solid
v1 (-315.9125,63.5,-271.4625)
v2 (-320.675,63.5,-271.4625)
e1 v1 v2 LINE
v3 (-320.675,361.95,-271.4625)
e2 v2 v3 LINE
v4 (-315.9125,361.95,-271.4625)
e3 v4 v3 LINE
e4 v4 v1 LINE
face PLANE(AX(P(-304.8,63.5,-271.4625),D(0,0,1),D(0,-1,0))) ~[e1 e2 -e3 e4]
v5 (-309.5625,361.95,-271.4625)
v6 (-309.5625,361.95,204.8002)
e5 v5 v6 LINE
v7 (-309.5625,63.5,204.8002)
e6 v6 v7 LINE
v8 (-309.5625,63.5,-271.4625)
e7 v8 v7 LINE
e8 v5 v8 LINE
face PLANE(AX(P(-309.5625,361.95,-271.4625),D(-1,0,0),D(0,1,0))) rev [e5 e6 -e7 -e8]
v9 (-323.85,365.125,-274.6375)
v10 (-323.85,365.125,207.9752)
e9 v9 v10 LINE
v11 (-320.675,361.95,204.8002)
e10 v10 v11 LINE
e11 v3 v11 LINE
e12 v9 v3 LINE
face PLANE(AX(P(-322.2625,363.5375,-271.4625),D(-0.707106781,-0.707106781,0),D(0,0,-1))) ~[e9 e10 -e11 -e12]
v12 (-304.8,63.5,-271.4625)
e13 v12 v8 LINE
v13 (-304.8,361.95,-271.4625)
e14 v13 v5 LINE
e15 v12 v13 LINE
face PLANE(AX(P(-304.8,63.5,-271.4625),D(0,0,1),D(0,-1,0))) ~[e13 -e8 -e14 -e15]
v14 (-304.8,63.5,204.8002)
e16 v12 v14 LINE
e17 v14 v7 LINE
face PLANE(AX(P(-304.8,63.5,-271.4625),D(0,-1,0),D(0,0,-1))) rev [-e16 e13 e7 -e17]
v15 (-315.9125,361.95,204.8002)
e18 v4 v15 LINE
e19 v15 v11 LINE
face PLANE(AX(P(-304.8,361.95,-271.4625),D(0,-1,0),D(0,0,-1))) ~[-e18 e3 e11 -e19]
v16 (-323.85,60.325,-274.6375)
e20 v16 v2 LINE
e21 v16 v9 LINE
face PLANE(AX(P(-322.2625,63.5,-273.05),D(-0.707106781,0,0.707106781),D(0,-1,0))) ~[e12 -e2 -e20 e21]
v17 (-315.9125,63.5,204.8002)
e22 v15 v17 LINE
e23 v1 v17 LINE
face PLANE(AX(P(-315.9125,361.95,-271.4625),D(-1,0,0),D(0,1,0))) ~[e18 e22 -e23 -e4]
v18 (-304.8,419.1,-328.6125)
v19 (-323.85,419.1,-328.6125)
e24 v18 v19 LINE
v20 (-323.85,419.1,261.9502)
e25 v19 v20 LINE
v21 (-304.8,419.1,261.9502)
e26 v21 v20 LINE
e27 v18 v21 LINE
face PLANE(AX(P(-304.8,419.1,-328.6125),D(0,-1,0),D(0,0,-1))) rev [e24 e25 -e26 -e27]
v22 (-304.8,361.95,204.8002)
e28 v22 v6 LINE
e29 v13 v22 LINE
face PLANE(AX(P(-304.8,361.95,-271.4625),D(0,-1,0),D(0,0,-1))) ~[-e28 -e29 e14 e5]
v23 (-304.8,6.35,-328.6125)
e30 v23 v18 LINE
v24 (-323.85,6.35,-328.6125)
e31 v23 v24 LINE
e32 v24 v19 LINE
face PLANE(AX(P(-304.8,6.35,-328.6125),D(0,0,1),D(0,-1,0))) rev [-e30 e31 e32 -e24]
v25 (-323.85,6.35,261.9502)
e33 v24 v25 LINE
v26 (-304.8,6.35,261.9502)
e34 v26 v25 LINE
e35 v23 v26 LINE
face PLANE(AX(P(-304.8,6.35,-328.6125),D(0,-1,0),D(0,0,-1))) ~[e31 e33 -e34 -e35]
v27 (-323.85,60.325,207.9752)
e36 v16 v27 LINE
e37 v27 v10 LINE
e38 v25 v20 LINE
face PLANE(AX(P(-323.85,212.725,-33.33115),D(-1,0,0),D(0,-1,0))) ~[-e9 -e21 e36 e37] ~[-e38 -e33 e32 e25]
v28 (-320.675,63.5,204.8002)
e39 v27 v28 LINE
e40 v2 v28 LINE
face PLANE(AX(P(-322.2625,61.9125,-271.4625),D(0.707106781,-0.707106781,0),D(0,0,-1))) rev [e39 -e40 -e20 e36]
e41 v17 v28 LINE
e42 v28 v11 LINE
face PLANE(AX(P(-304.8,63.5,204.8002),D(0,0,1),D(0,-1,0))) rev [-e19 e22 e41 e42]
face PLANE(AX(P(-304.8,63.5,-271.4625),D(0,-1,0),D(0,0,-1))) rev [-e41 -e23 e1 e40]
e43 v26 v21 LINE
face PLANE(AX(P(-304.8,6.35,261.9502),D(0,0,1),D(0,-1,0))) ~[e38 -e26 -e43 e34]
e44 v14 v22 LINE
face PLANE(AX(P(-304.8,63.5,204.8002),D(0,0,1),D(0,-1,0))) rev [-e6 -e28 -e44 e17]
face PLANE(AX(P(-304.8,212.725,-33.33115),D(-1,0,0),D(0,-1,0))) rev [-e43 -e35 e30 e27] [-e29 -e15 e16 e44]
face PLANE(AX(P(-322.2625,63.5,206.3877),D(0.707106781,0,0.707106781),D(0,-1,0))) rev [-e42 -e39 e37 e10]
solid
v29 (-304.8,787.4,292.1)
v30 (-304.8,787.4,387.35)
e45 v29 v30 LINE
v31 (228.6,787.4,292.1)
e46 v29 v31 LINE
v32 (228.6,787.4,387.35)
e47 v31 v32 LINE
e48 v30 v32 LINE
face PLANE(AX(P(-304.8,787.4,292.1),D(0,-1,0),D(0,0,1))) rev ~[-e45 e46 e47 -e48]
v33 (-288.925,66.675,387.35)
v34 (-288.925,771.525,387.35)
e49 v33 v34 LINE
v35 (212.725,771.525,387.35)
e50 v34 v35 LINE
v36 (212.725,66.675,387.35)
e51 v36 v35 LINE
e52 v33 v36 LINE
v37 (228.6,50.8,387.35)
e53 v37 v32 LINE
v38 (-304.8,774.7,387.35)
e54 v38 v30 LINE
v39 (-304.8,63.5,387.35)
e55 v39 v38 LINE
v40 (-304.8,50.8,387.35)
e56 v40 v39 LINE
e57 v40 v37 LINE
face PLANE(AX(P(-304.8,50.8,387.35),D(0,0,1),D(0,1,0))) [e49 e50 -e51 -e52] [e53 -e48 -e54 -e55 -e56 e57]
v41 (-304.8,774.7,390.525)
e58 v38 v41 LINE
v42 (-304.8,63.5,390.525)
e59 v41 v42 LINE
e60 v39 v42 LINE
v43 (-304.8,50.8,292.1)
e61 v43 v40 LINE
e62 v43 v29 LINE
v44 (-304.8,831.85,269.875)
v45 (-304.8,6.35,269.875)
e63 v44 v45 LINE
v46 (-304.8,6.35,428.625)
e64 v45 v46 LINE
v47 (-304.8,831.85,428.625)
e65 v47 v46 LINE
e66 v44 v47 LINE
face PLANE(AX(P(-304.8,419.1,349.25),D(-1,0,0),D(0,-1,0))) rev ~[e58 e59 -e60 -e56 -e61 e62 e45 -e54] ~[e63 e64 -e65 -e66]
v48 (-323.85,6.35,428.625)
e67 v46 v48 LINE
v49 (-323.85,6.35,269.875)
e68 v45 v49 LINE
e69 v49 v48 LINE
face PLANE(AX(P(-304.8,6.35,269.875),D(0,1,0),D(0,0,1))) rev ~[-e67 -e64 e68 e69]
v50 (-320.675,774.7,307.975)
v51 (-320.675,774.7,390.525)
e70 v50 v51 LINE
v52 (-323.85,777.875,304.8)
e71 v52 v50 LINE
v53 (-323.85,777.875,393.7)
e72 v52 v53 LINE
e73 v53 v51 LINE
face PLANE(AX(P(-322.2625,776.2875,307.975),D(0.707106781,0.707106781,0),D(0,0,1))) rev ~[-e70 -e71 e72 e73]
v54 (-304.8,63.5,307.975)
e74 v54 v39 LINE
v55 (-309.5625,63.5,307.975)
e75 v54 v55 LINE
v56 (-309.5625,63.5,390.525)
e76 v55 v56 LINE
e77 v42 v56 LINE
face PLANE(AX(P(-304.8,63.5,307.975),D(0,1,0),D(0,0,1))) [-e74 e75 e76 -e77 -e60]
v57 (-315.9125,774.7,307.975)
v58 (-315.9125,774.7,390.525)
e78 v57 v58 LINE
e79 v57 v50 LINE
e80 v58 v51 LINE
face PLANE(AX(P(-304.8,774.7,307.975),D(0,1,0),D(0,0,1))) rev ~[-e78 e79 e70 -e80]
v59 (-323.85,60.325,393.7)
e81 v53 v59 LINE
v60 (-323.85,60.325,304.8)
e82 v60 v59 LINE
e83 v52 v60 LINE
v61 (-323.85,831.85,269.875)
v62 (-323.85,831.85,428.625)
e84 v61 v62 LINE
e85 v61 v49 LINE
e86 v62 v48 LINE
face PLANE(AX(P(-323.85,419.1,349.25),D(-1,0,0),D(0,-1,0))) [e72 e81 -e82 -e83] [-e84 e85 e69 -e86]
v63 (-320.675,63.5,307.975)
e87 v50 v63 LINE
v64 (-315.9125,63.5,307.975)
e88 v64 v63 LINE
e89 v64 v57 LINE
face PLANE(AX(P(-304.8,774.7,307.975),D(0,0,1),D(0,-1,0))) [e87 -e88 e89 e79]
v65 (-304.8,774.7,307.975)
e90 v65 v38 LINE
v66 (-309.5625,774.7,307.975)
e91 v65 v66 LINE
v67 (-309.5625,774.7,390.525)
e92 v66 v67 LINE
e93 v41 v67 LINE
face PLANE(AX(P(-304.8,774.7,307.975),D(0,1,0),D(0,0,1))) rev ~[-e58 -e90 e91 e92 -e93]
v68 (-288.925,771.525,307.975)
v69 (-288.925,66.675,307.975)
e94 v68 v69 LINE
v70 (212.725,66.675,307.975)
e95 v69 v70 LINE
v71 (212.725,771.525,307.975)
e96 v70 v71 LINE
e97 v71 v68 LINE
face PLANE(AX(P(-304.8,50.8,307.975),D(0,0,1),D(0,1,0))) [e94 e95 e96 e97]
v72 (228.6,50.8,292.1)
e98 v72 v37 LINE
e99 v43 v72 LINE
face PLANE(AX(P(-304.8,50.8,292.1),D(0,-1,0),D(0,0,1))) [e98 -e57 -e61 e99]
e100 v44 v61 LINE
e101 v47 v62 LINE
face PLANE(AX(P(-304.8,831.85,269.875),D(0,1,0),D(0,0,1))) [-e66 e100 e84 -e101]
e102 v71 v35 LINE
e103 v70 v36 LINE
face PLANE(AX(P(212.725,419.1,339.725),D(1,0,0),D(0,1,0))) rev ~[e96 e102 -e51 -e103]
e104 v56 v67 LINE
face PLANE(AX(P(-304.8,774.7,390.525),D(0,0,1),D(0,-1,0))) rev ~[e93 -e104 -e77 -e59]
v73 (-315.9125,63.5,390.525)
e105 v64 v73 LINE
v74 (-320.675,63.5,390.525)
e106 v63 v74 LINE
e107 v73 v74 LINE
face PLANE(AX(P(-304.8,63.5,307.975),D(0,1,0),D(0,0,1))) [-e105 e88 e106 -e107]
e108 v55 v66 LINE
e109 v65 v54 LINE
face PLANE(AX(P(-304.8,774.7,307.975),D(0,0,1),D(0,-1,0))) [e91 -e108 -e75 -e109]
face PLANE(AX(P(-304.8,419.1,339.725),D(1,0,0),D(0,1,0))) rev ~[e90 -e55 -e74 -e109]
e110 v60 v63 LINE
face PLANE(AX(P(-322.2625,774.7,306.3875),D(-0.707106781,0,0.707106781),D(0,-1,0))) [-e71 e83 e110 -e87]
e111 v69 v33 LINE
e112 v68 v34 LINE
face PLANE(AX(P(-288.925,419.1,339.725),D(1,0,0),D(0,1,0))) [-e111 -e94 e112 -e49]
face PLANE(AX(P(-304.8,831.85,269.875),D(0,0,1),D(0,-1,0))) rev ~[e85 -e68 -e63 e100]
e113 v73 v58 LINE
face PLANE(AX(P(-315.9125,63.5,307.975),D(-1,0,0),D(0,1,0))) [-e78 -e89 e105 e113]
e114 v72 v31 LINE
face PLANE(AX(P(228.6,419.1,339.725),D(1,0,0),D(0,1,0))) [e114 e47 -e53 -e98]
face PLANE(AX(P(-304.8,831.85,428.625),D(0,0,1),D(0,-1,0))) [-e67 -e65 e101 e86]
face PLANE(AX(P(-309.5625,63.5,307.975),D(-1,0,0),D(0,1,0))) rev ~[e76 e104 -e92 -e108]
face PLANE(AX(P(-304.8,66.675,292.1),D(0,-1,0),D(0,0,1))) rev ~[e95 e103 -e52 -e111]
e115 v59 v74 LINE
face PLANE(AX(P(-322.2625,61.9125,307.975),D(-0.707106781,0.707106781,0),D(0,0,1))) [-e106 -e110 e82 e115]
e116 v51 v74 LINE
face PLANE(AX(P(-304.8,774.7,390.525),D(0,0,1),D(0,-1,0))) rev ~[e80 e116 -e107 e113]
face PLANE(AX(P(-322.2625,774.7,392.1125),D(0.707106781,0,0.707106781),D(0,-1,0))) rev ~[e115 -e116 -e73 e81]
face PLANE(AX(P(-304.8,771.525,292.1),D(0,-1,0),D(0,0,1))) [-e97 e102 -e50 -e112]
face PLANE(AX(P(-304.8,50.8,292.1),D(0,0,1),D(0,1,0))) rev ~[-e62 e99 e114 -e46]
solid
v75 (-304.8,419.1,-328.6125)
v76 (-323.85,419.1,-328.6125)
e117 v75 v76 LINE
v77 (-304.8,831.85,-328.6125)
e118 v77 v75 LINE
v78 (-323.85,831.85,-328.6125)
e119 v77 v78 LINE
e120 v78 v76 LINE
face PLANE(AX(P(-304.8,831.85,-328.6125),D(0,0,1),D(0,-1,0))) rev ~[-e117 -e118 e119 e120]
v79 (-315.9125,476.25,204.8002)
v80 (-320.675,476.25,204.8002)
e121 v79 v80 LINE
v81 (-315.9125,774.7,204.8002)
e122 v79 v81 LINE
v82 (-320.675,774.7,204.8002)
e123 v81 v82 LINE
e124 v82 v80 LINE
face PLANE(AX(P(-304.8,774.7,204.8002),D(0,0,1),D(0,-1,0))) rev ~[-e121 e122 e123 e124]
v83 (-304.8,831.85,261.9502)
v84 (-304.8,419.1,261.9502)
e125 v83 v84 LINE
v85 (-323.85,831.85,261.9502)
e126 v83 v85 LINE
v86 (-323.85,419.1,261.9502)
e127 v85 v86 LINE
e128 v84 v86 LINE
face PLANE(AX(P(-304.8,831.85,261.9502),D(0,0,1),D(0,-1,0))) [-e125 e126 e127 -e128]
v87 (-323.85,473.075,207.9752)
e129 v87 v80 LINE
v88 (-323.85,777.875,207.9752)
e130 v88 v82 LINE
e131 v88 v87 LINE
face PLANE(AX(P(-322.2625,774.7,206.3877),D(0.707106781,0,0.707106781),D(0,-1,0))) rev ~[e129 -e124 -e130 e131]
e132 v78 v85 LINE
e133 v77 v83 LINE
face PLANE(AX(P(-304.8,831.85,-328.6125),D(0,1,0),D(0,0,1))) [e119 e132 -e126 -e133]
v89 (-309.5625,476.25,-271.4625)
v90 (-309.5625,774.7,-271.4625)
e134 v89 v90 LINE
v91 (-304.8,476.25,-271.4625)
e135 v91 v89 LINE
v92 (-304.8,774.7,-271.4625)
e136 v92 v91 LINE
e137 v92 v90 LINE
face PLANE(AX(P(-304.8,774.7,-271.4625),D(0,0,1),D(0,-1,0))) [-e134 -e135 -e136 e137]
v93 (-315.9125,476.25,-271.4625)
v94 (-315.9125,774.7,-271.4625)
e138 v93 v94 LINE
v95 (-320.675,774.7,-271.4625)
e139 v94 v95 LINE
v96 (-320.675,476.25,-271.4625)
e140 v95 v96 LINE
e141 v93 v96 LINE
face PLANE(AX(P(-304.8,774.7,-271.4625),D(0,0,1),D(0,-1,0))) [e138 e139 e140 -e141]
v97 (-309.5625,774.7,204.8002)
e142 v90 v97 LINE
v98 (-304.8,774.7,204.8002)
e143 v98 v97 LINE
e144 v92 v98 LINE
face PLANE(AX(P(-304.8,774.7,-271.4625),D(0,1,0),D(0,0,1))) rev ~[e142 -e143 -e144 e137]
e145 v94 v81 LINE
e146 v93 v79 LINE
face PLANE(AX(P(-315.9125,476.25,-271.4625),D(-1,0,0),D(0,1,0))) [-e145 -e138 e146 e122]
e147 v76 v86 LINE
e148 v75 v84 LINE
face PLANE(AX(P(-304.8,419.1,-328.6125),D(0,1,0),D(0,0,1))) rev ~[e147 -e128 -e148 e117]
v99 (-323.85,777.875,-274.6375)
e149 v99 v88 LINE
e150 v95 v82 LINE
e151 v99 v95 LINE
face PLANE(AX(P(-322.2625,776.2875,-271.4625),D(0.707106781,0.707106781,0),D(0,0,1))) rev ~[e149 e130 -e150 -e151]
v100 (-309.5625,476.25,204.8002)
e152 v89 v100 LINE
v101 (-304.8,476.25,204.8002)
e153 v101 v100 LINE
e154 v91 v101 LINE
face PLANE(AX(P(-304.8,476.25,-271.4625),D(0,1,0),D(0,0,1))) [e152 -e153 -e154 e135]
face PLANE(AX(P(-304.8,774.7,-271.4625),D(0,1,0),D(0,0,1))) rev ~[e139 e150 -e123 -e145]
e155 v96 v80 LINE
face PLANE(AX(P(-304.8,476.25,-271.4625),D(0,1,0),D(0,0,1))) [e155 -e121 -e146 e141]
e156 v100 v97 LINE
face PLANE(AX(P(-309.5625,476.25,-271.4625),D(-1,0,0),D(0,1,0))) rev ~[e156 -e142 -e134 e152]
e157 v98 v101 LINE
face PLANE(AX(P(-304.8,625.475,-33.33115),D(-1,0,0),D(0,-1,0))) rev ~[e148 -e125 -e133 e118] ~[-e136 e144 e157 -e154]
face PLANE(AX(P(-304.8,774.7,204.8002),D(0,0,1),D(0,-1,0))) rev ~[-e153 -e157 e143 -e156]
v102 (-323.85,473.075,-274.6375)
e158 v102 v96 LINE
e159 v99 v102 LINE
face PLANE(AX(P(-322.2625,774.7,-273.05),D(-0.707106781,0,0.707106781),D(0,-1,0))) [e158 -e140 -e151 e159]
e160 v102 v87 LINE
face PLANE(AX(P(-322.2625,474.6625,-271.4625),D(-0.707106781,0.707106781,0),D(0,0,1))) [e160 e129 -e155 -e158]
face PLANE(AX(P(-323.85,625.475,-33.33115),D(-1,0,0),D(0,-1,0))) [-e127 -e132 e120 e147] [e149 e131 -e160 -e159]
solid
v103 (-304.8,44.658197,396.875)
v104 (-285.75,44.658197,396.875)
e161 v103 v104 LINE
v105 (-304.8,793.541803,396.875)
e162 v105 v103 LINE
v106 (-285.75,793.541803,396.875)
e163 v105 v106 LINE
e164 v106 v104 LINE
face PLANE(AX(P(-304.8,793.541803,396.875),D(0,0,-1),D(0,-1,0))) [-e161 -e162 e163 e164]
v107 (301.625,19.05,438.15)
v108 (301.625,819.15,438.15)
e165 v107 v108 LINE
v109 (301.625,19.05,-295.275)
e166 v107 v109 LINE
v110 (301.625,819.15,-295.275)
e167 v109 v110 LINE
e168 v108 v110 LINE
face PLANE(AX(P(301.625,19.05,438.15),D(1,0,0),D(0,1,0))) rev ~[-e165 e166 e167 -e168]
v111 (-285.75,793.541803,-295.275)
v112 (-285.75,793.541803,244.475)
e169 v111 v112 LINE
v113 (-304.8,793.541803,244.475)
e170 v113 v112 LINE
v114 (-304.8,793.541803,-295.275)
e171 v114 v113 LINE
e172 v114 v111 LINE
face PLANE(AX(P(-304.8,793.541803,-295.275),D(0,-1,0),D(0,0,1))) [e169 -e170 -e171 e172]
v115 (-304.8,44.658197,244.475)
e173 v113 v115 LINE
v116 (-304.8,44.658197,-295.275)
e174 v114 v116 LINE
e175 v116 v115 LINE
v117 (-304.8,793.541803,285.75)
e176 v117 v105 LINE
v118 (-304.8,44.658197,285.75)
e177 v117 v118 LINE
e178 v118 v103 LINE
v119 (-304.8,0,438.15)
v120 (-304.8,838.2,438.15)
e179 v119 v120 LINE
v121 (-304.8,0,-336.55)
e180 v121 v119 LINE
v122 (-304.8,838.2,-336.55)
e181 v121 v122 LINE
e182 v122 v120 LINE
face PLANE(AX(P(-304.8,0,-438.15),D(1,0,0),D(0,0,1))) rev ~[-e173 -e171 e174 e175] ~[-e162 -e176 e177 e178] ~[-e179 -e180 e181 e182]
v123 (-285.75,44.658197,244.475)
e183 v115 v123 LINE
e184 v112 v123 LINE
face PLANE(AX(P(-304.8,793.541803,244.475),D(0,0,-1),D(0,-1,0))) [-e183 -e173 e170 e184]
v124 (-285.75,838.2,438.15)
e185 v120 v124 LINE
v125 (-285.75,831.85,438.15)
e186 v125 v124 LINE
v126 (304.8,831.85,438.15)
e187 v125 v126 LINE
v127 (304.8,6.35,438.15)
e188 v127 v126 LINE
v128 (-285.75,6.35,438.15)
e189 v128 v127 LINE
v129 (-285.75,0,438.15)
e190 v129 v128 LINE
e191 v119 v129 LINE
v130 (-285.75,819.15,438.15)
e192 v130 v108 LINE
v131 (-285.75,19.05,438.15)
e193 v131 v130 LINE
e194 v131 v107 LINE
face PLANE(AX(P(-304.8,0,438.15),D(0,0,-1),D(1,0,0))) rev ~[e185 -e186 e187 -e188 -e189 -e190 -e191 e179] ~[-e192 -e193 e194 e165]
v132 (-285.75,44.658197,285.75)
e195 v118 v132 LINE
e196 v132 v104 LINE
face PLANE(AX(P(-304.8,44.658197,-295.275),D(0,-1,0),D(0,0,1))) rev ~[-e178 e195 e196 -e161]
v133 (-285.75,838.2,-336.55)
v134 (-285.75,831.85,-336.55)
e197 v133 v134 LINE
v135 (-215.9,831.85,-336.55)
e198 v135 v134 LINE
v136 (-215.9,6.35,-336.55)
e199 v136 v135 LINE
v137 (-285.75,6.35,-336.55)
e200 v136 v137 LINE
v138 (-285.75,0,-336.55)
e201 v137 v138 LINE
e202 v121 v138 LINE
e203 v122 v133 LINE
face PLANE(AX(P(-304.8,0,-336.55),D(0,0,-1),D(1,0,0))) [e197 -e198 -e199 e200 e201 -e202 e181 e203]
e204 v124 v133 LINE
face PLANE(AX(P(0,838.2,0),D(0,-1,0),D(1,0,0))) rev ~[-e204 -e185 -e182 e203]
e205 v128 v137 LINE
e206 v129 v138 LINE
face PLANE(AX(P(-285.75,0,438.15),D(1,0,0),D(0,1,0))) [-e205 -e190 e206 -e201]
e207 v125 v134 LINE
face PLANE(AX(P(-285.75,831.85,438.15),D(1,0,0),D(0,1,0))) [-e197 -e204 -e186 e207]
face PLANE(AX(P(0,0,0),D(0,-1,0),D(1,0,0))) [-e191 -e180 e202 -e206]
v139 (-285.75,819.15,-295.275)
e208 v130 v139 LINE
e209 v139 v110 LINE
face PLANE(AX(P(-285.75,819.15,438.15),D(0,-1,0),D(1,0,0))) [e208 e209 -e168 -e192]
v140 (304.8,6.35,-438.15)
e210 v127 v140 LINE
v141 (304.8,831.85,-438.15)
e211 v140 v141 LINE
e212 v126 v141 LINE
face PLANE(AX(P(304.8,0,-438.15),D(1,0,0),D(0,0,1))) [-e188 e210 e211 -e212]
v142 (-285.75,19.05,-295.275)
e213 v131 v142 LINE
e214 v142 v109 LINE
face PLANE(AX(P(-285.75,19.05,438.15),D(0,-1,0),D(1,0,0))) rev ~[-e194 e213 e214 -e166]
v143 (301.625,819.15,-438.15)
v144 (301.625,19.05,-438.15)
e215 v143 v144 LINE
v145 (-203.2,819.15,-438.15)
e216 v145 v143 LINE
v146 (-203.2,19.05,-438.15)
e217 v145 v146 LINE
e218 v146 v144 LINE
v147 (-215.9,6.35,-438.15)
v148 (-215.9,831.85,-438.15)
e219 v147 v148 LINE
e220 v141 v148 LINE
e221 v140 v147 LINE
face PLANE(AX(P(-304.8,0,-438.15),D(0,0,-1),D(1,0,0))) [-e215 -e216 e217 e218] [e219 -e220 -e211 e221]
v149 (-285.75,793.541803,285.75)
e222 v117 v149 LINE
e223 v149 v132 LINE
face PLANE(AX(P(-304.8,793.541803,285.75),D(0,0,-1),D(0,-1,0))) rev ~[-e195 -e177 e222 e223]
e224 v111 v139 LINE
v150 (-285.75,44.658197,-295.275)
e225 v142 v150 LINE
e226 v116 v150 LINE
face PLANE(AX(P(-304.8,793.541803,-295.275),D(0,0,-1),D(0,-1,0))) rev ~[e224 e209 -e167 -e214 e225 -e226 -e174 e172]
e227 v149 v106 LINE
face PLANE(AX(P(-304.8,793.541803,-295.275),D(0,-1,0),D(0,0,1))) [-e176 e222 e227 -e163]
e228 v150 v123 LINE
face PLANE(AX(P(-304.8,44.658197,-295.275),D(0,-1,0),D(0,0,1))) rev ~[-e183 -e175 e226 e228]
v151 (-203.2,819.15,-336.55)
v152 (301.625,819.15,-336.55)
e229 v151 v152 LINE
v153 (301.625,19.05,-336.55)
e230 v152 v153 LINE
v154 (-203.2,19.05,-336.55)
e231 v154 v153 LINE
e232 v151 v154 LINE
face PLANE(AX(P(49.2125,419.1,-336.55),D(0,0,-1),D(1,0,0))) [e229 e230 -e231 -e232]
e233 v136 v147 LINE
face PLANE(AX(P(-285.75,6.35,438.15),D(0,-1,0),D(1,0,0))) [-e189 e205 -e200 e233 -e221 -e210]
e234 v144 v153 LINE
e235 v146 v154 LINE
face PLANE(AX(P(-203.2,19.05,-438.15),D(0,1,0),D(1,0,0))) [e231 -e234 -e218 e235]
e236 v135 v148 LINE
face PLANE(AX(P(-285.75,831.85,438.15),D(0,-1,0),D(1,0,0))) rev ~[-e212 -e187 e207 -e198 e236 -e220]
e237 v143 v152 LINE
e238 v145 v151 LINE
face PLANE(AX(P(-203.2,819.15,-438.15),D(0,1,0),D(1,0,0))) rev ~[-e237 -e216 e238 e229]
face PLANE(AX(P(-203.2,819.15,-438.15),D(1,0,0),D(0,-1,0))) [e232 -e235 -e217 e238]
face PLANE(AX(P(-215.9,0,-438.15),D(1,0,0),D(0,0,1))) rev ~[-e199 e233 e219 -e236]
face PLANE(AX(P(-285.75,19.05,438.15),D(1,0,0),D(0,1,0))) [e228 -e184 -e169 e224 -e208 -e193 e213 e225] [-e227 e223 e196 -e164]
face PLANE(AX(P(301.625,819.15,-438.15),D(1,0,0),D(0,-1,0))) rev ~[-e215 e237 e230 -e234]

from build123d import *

# Parameters (mm, degrees)
F0_W          = 609.6
F0_H          = 876.3
F1_DEPTH      = 838.2
F2_W          = 88.9
F2_H          = 101.6
F3_DEPTH      = 838.201
F4_W          = 748.8836065574
F4_H          = 692.15
F5_DEPTH      = 19.05
F6_W          = 590.55
F6_H          = 6.35
F7_DEPTH      = 876.301
F8_W          = 587.375
F8_H          = 800.1
F9_DEPTH      = 733.425
F10_W         = 748.8836065574
F10_H         = 41.275
F11_DEPTH     = 19.05
F12_W         = 412.75
F12_H         = 590.5627
F12_W_2       = 298.45
F12_H_2       = 476.2627
F13_DEPTH     = 19.05
F14_W         = 6.35
F14_H         = 298.45
F15_DEPTH     = 476.2627
F16_SIZE      = 3.175
F17_W         = 825.5
F17_H         = 158.75
F17_W_2       = 711.2
F17_H_2       = 82.55
F18_DEPTH     = 19.05
F19_W         = 6.35
F19_H         = 711.2
F20_DEPTH     = 82.55
F21_SIZE      = 3.175
F22_W         = 504.825
F22_H         = 800.1
F23_DEPTH     = 101.6
F24_W         = 736.6
F24_H         = 95.25
F25_DEPTH     = 533.4
F26_T         = 15.875
F26_T3_DEPTH  = 37.249261314
F26_T5_DEPTH  = 37.249261314
F26_T7_DEPTH  = 37.249261314
F26_T9_DEPTH  = 37.249261314
F26_T11_DEPTH = 36.5125
F26_T13_DEPTH = 742.95
F26_T15_DEPTH = 114.3
F26_T17_DEPTH = 127
F26_T19_DEPTH = 768.35
F26_T21_DEPTH = 111.125
F26_T23_DEPTH = 36.5125


# Not quite as in the source:
# - a shell that OpenCascade refuses in one call is made with other operations: the cavity is built on its own and cut out


with BuildPart() as f1:
    # F0 (on Front) → F1 (new body)
    with BuildSketch(Plane.XZ):
        Rectangle(F0_W, F0_H)
    extrude(amount=-F1_DEPTH)

    # F2 (on face) → F3 (cut, through all)
    with BuildSketch(Plane.XZ):
        with Locations((-260.35, -387.35)):
            Rectangle(F2_W, F2_H)
    extrude(amount=-F3_DEPTH, mode=Mode.SUBTRACT)

    # F4 (on face) → F5 (cut)
    with BuildSketch(Plane(origin=(-304.8, 0, 0), x_dir=(0, -1, 0), z_dir=(-1, 0, 0))):
        with Locations((-419.1, 50.8)):
            Rectangle(F4_W, F4_H)
    extrude(amount=-F5_DEPTH, mode=Mode.SUBTRACT)

    # F6 (on face) → F7 (cut, through all)
    with BuildSketch(Plane.XY.offset(438.15)):
        with Locations((9.525, 835.025)):
            Rectangle(F6_W, F6_H)
        with Locations((9.525, 3.175)):
            Rectangle(F6_W, F6_H)
    extrude(amount=-F7_DEPTH, mode=Mode.SUBTRACT)

    # F8 (on face) → F9 (cut, through all)
    with BuildSketch(Plane.XY.offset(438.15)):
        with Locations((7.9375, 419.1)):
            Rectangle(F8_W, F8_H)
    extrude(amount=-F9_DEPTH, mode=Mode.SUBTRACT)

    # F10 (on face) → F11 (join, through all)
    with BuildSketch(Plane(origin=(-304.8, 0, 0), x_dir=(0, -1, 0), z_dir=(-1, 0, 0))):
        with Locations((-419.1, 265.1125)):
            Rectangle(F10_W, F10_H)
    extrude(amount=-F11_DEPTH)

    # F22 (on face) → F23 (cut)
    with BuildSketch(Plane(origin=(0, 0, -438.15), x_dir=(1, 0, 0), z_dir=(0, 0, -1))):
        with Locations((49.2125, -419.1)):
            Rectangle(F22_W, F22_H)
    extrude(amount=-F23_DEPTH, mode=Mode.SUBTRACT)


with BuildPart() as f13:
    # F12 (on face) → F13 (new body)
    with BuildSketch(Plane(origin=(-304.8, 0, 0), x_dir=(0, -1, 0), z_dir=(-1, 0, 0))):
        with Locations((-625.475, -33.33115)):
            Rectangle(F12_W, F12_H)
        with Locations((-625.475, -33.33115)):
            Rectangle(F12_W_2, F12_H_2, mode=Mode.SUBTRACT)
    extrude(amount=F13_DEPTH)

    # F14 (on face) → F15 (join, through all)
    with BuildSketch(Plane.XY.offset(-271.4625)):
        with Locations((-312.7375, 625.475)):
            Rectangle(F14_W, F14_H)
    extrude(amount=F15_DEPTH)

    # F16
    f16_edges = [f13.edges().sort_by_distance(p)[0] for p in [
        (-323.85, 774.7, -33.33115),
        (-323.85, 625.475, -271.4625),
        (-323.85, 476.25, -33.33115),
        (-323.85, 625.475, 204.8002),
    ]]
    chamfer(f16_edges, length=F16_SIZE)


with BuildPart() as f18:
    # F17 (on face) → F18 (new body)
    with BuildSketch(Plane(origin=(-304.8, 0, 0), x_dir=(0, -1, 0), z_dir=(-1, 0, 0))):
        with Locations((-419.1, 349.25)):
            Rectangle(F17_W, F17_H)
        with Locations((-419.1, 349.25)):
            Rectangle(F17_W_2, F17_H_2, mode=Mode.SUBTRACT)
    extrude(amount=F18_DEPTH)

    # F19 (on face) → F20 (join, through all)
    with BuildSketch(Plane.XY.offset(307.975)):
        with Locations((-312.7375, 419.1)):
            Rectangle(F19_W, F19_H)
    extrude(amount=F20_DEPTH)

    # F21
    f21_edges = [f18.edges().sort_by_distance(p)[0] for p in [
        (-323.85, 419.1, 307.975),
        (-323.85, 774.7, 349.25),
        (-323.85, 419.1, 390.525),
        (-323.85, 63.5, 349.25),
    ]]
    chamfer(f21_edges, length=F21_SIZE)

    # F24 (on face) → F25 (join)
    with BuildSketch(Plane.YZ.offset(-304.8)):
        with Locations((419.1, 339.725)):
            Rectangle(F24_W, F24_H)
    extrude(amount=F25_DEPTH)

    # F26: shell of thickness 15.875, made by hand


with BuildPart() as f26_core1:
    # F26_t2: copy of F18
    add(f18.part)

    # the walls: a layer under each face that stays
    f26_faces = [f26_core1.faces().sort_by_distance(p)[0] for p in [
        (-323.85, 694.2666666667, 296.3333333333),
        (-322.2625, 419.1, 306.3875),
        (-322.2625, 61.9125, 349.25),
        (-322.2625, 776.2875, 349.25),
        (-322.2625, 419.1, 392.1125),
        (-314.325, 419.1, 428.625),
        (-314.325, 831.85, 349.25),
        (-314.325, 419.1, 269.875),
        (-314.325, 6.35, 349.25),
        (-318.29375, 419.1, 307.975),
        (-318.29375, 63.5, 349.25),
        (-318.29375, 774.7, 349.25),
        (-318.29375, 419.1, 390.525),
        (-304.8, 694.2666666667, 402.1666666667),
        (-315.9125, 419.1, 349.25),
        (-38.1, 787.4, 339.725),
        (-38.1, 419.1, 292.1),
        (-38.1, 50.8, 339.725),
        (-307.18125, 63.5, 349.25),
        (-307.18125, 419.1, 390.525),
        (-307.18125, 774.7, 349.25),
        (-304.8, 419.1, 347.6625),
        (228.6, 419.1, 339.725),
        (-307.18125, 419.1, 307.975),
        (-309.5625, 419.1, 349.25),
    ]]
    thicken(f26_faces, amount=-F26_T, mode=Mode.SUBTRACT)

    # F26_s4 → F26_t3 (cut)
    with BuildSketch(Plane(origin=(4.5928978099, 4.5928978099, 4.5928978099), x_dir=(-0.7071067812, 0.7071067812, 0), z_dir=(0.5773502692, 0.5773502692, 0.5773502692))):
        Polygon((271.8908726623, 356.5892701441), (263.7152476623, 342.7036353262), (255.7777476623, 347.2863530879), (255.7777476623, 356.4517886113), align=None)
    extrude(amount=F26_T3_DEPTH, mode=Mode.SUBTRACT)

    # F26_s6 → F26_t5 (cut)
    with BuildSketch(Plane(origin=(-274.8071021901, 274.80710219, -274.8071021901), x_dir=(0.7071067812, 0.7071067812, 0), z_dir=(0.5773502692, -0.5773502692, 0.5773502692))):
        Polygon((320.8060313282, 698.7829872109), (328.9816563282, 684.897352393), (336.9191563282, 689.4800701547), (336.9191563282, 698.6455056781), align=None)
    extrude(amount=F26_T5_DEPTH, mode=Mode.SUBTRACT)

    # F26_s8 → F26_t7 (cut)
    with BuildSketch(Plane(origin=(-228.2404355234, -228.2404355234, 228.2404355234), x_dir=(-0.7071067812, 0.7071067812, 0), z_dir=(0.5773502692, 0.5773502692, -0.5773502692))):
        Polygon((271.8908726623, 213.7335916339), (255.7777476623, 213.8710731668), (255.7777476623, 223.0365086901), (263.7152476623, 227.6192264518), align=None)
    extrude(amount=F26_T7_DEPTH, mode=Mode.SUBTRACT)

    # F26_s10 → F26_t9 (cut)
    with BuildSketch(Plane(origin=(-507.6404355234, 507.6404355234, 507.6404355234), x_dir=(0.7071067812, 0.7071067812, 0), z_dir=(0.5773502692, -0.5773502692, -0.5773502692))):
        Polygon((320.8060313282, -128.4601254329), (336.9191563282, -128.3226439001), (336.9191563282, -119.1572083767), (328.9816563282, -114.574490615), align=None)
    extrude(amount=F26_T9_DEPTH, mode=Mode.SUBTRACT)

    # F26_s12 → F26_t11 (cut)
    with BuildSketch(Plane.YZ.offset(-336.55)):
        Polygon((774.54125, 308.13375), (774.7, 292.1), (790.575, 292.1), (790.575, 307.975), align=None)
        Polygon((63.65875, 308.13375), (63.5, 292.1), (47.625, 292.1), (47.625, 307.975), align=None)
        Polygon((63.65875, 390.36625), (47.625, 390.525), (47.625, 406.4), (63.5, 406.4), align=None)
        Polygon((774.54125, 390.36625), (790.575, 390.525), (790.575, 406.4), (774.7, 406.4), align=None)
    extrude(amount=F26_T11_DEPTH, mode=Mode.SUBTRACT)

    # F26_s14 → F26_t13 (cut)
    with BuildSketch(Plane.XZ.offset(-790.575)):
        Polygon((-316.07125, 308.13375), (-315.9125, 292.1), (-300.0375, 292.1), (-300.0375, 307.975), align=None)
        Polygon((-316.07125, 390.36625), (-315.9125, 406.4), (-300.0375, 406.4), (-300.0375, 390.525), align=None)
        Polygon((-309.40375, 390.36625), (-309.5625, 406.4), (-325.4375, 406.4), (-325.4375, 390.525), align=None)
        Polygon((-304.95875, 308.13375), (-288.925, 307.975), (-288.925, 292.1), (-304.8, 292.1), align=None)
        Polygon((-309.40375, 308.13375), (-309.5625, 292.1), (-325.4375, 292.1), (-325.4375, 307.975), align=None)
    extrude(amount=F26_T13_DEPTH, mode=Mode.SUBTRACT)

    # F26_s16 → F26_t15 (cut)
    with BuildSketch(Plane.XY.offset(292.1)):
        Polygon((-316.07125, 63.65875), (-315.9125, 47.625), (-300.0375, 47.625), (-300.0375, 63.5), align=None)
        Polygon((-316.07125, 774.54125), (-315.9125, 790.575), (-300.0375, 790.575), (-300.0375, 774.7), align=None)
        Polygon((-309.40375, 63.65875), (-309.5625, 47.625), (-325.4375, 47.625), (-325.4375, 63.5), align=None)
        Polygon((-309.40375, 774.54125), (-309.5625, 790.575), (-325.4375, 790.575), (-325.4375, 774.7), align=None)
    extrude(amount=F26_T15_DEPTH, mode=Mode.SUBTRACT)

    # F26_s18 → F26_t17 (cut)
    with BuildSketch(Plane.XY.offset(276.225)):
        Polygon((-304.64125, 787.55875), (-320.675, 787.4), (-320.675, 771.525), (-304.8, 771.525), align=None)
        Polygon((-304.64125, 50.64125), (-320.675, 50.8), (-320.675, 66.675), (-304.8, 66.675), align=None)
    extrude(amount=F26_T17_DEPTH, mode=Mode.SUBTRACT)

    # F26_s20 → F26_t19 (cut)
    with BuildSketch(Plane.XZ.offset(-803.275)):
        Polygon((-304.64125, 291.94125), (-320.675, 292.1), (-320.675, 307.975), (-304.8, 307.975), align=None)
    extrude(amount=F26_T19_DEPTH, mode=Mode.SUBTRACT)

    # F26_s22 → F26_t21 (cut)
    with BuildSketch(Plane.XY.offset(292.1)):
        Polygon((-304.95875, 63.65875), (-304.8, 47.625), (-288.925, 47.625), (-288.925, 63.5), align=None)
        Polygon((-304.95875, 774.54125), (-304.8, 790.575), (-288.925, 790.575), (-288.925, 774.7), align=None)
    extrude(amount=F26_T21_DEPTH, mode=Mode.SUBTRACT)

    # F26_s24 → F26_t23 (cut)
    with BuildSketch(Plane.YZ.offset(-325.4375)):
        Polygon((63.65875, 308.13375), (47.625, 307.975), (47.625, 292.1), (63.5, 292.1), align=None)
        Polygon((63.65875, 390.36625), (47.625, 390.525), (47.625, 406.4), (63.5, 406.4), align=None)
        Polygon((774.54125, 390.36625), (774.7, 406.4), (790.575, 406.4), (790.575, 390.525), align=None)
        Polygon((774.54125, 308.13375), (790.575, 307.975), (790.575, 292.1), (774.7, 292.1), align=None)
    extrude(amount=F26_T23_DEPTH, mode=Mode.SUBTRACT)


with BuildPart() as f18_1:
    add(f18.part)

    # what is left inside the walls is the cavity
    f26_cavity = [f26_core1.part.solids().sort_by_distance(p)[0] for p in [
        (45.508333, 419.1, 308.13375),
    ]]
    add(f26_cavity, mode=Mode.SUBTRACT)


with BuildPart() as f27_1:
    # F27: instance of F13
    add(f13.part.mirror(Plane(origin=(-314.325, 419.1, -33.33115), x_dir=(1, 0, 0), z_dir=(0, -1, 0))))


solid = Compound([f1.part, f13.part, f18_1.part, f27_1.part])
